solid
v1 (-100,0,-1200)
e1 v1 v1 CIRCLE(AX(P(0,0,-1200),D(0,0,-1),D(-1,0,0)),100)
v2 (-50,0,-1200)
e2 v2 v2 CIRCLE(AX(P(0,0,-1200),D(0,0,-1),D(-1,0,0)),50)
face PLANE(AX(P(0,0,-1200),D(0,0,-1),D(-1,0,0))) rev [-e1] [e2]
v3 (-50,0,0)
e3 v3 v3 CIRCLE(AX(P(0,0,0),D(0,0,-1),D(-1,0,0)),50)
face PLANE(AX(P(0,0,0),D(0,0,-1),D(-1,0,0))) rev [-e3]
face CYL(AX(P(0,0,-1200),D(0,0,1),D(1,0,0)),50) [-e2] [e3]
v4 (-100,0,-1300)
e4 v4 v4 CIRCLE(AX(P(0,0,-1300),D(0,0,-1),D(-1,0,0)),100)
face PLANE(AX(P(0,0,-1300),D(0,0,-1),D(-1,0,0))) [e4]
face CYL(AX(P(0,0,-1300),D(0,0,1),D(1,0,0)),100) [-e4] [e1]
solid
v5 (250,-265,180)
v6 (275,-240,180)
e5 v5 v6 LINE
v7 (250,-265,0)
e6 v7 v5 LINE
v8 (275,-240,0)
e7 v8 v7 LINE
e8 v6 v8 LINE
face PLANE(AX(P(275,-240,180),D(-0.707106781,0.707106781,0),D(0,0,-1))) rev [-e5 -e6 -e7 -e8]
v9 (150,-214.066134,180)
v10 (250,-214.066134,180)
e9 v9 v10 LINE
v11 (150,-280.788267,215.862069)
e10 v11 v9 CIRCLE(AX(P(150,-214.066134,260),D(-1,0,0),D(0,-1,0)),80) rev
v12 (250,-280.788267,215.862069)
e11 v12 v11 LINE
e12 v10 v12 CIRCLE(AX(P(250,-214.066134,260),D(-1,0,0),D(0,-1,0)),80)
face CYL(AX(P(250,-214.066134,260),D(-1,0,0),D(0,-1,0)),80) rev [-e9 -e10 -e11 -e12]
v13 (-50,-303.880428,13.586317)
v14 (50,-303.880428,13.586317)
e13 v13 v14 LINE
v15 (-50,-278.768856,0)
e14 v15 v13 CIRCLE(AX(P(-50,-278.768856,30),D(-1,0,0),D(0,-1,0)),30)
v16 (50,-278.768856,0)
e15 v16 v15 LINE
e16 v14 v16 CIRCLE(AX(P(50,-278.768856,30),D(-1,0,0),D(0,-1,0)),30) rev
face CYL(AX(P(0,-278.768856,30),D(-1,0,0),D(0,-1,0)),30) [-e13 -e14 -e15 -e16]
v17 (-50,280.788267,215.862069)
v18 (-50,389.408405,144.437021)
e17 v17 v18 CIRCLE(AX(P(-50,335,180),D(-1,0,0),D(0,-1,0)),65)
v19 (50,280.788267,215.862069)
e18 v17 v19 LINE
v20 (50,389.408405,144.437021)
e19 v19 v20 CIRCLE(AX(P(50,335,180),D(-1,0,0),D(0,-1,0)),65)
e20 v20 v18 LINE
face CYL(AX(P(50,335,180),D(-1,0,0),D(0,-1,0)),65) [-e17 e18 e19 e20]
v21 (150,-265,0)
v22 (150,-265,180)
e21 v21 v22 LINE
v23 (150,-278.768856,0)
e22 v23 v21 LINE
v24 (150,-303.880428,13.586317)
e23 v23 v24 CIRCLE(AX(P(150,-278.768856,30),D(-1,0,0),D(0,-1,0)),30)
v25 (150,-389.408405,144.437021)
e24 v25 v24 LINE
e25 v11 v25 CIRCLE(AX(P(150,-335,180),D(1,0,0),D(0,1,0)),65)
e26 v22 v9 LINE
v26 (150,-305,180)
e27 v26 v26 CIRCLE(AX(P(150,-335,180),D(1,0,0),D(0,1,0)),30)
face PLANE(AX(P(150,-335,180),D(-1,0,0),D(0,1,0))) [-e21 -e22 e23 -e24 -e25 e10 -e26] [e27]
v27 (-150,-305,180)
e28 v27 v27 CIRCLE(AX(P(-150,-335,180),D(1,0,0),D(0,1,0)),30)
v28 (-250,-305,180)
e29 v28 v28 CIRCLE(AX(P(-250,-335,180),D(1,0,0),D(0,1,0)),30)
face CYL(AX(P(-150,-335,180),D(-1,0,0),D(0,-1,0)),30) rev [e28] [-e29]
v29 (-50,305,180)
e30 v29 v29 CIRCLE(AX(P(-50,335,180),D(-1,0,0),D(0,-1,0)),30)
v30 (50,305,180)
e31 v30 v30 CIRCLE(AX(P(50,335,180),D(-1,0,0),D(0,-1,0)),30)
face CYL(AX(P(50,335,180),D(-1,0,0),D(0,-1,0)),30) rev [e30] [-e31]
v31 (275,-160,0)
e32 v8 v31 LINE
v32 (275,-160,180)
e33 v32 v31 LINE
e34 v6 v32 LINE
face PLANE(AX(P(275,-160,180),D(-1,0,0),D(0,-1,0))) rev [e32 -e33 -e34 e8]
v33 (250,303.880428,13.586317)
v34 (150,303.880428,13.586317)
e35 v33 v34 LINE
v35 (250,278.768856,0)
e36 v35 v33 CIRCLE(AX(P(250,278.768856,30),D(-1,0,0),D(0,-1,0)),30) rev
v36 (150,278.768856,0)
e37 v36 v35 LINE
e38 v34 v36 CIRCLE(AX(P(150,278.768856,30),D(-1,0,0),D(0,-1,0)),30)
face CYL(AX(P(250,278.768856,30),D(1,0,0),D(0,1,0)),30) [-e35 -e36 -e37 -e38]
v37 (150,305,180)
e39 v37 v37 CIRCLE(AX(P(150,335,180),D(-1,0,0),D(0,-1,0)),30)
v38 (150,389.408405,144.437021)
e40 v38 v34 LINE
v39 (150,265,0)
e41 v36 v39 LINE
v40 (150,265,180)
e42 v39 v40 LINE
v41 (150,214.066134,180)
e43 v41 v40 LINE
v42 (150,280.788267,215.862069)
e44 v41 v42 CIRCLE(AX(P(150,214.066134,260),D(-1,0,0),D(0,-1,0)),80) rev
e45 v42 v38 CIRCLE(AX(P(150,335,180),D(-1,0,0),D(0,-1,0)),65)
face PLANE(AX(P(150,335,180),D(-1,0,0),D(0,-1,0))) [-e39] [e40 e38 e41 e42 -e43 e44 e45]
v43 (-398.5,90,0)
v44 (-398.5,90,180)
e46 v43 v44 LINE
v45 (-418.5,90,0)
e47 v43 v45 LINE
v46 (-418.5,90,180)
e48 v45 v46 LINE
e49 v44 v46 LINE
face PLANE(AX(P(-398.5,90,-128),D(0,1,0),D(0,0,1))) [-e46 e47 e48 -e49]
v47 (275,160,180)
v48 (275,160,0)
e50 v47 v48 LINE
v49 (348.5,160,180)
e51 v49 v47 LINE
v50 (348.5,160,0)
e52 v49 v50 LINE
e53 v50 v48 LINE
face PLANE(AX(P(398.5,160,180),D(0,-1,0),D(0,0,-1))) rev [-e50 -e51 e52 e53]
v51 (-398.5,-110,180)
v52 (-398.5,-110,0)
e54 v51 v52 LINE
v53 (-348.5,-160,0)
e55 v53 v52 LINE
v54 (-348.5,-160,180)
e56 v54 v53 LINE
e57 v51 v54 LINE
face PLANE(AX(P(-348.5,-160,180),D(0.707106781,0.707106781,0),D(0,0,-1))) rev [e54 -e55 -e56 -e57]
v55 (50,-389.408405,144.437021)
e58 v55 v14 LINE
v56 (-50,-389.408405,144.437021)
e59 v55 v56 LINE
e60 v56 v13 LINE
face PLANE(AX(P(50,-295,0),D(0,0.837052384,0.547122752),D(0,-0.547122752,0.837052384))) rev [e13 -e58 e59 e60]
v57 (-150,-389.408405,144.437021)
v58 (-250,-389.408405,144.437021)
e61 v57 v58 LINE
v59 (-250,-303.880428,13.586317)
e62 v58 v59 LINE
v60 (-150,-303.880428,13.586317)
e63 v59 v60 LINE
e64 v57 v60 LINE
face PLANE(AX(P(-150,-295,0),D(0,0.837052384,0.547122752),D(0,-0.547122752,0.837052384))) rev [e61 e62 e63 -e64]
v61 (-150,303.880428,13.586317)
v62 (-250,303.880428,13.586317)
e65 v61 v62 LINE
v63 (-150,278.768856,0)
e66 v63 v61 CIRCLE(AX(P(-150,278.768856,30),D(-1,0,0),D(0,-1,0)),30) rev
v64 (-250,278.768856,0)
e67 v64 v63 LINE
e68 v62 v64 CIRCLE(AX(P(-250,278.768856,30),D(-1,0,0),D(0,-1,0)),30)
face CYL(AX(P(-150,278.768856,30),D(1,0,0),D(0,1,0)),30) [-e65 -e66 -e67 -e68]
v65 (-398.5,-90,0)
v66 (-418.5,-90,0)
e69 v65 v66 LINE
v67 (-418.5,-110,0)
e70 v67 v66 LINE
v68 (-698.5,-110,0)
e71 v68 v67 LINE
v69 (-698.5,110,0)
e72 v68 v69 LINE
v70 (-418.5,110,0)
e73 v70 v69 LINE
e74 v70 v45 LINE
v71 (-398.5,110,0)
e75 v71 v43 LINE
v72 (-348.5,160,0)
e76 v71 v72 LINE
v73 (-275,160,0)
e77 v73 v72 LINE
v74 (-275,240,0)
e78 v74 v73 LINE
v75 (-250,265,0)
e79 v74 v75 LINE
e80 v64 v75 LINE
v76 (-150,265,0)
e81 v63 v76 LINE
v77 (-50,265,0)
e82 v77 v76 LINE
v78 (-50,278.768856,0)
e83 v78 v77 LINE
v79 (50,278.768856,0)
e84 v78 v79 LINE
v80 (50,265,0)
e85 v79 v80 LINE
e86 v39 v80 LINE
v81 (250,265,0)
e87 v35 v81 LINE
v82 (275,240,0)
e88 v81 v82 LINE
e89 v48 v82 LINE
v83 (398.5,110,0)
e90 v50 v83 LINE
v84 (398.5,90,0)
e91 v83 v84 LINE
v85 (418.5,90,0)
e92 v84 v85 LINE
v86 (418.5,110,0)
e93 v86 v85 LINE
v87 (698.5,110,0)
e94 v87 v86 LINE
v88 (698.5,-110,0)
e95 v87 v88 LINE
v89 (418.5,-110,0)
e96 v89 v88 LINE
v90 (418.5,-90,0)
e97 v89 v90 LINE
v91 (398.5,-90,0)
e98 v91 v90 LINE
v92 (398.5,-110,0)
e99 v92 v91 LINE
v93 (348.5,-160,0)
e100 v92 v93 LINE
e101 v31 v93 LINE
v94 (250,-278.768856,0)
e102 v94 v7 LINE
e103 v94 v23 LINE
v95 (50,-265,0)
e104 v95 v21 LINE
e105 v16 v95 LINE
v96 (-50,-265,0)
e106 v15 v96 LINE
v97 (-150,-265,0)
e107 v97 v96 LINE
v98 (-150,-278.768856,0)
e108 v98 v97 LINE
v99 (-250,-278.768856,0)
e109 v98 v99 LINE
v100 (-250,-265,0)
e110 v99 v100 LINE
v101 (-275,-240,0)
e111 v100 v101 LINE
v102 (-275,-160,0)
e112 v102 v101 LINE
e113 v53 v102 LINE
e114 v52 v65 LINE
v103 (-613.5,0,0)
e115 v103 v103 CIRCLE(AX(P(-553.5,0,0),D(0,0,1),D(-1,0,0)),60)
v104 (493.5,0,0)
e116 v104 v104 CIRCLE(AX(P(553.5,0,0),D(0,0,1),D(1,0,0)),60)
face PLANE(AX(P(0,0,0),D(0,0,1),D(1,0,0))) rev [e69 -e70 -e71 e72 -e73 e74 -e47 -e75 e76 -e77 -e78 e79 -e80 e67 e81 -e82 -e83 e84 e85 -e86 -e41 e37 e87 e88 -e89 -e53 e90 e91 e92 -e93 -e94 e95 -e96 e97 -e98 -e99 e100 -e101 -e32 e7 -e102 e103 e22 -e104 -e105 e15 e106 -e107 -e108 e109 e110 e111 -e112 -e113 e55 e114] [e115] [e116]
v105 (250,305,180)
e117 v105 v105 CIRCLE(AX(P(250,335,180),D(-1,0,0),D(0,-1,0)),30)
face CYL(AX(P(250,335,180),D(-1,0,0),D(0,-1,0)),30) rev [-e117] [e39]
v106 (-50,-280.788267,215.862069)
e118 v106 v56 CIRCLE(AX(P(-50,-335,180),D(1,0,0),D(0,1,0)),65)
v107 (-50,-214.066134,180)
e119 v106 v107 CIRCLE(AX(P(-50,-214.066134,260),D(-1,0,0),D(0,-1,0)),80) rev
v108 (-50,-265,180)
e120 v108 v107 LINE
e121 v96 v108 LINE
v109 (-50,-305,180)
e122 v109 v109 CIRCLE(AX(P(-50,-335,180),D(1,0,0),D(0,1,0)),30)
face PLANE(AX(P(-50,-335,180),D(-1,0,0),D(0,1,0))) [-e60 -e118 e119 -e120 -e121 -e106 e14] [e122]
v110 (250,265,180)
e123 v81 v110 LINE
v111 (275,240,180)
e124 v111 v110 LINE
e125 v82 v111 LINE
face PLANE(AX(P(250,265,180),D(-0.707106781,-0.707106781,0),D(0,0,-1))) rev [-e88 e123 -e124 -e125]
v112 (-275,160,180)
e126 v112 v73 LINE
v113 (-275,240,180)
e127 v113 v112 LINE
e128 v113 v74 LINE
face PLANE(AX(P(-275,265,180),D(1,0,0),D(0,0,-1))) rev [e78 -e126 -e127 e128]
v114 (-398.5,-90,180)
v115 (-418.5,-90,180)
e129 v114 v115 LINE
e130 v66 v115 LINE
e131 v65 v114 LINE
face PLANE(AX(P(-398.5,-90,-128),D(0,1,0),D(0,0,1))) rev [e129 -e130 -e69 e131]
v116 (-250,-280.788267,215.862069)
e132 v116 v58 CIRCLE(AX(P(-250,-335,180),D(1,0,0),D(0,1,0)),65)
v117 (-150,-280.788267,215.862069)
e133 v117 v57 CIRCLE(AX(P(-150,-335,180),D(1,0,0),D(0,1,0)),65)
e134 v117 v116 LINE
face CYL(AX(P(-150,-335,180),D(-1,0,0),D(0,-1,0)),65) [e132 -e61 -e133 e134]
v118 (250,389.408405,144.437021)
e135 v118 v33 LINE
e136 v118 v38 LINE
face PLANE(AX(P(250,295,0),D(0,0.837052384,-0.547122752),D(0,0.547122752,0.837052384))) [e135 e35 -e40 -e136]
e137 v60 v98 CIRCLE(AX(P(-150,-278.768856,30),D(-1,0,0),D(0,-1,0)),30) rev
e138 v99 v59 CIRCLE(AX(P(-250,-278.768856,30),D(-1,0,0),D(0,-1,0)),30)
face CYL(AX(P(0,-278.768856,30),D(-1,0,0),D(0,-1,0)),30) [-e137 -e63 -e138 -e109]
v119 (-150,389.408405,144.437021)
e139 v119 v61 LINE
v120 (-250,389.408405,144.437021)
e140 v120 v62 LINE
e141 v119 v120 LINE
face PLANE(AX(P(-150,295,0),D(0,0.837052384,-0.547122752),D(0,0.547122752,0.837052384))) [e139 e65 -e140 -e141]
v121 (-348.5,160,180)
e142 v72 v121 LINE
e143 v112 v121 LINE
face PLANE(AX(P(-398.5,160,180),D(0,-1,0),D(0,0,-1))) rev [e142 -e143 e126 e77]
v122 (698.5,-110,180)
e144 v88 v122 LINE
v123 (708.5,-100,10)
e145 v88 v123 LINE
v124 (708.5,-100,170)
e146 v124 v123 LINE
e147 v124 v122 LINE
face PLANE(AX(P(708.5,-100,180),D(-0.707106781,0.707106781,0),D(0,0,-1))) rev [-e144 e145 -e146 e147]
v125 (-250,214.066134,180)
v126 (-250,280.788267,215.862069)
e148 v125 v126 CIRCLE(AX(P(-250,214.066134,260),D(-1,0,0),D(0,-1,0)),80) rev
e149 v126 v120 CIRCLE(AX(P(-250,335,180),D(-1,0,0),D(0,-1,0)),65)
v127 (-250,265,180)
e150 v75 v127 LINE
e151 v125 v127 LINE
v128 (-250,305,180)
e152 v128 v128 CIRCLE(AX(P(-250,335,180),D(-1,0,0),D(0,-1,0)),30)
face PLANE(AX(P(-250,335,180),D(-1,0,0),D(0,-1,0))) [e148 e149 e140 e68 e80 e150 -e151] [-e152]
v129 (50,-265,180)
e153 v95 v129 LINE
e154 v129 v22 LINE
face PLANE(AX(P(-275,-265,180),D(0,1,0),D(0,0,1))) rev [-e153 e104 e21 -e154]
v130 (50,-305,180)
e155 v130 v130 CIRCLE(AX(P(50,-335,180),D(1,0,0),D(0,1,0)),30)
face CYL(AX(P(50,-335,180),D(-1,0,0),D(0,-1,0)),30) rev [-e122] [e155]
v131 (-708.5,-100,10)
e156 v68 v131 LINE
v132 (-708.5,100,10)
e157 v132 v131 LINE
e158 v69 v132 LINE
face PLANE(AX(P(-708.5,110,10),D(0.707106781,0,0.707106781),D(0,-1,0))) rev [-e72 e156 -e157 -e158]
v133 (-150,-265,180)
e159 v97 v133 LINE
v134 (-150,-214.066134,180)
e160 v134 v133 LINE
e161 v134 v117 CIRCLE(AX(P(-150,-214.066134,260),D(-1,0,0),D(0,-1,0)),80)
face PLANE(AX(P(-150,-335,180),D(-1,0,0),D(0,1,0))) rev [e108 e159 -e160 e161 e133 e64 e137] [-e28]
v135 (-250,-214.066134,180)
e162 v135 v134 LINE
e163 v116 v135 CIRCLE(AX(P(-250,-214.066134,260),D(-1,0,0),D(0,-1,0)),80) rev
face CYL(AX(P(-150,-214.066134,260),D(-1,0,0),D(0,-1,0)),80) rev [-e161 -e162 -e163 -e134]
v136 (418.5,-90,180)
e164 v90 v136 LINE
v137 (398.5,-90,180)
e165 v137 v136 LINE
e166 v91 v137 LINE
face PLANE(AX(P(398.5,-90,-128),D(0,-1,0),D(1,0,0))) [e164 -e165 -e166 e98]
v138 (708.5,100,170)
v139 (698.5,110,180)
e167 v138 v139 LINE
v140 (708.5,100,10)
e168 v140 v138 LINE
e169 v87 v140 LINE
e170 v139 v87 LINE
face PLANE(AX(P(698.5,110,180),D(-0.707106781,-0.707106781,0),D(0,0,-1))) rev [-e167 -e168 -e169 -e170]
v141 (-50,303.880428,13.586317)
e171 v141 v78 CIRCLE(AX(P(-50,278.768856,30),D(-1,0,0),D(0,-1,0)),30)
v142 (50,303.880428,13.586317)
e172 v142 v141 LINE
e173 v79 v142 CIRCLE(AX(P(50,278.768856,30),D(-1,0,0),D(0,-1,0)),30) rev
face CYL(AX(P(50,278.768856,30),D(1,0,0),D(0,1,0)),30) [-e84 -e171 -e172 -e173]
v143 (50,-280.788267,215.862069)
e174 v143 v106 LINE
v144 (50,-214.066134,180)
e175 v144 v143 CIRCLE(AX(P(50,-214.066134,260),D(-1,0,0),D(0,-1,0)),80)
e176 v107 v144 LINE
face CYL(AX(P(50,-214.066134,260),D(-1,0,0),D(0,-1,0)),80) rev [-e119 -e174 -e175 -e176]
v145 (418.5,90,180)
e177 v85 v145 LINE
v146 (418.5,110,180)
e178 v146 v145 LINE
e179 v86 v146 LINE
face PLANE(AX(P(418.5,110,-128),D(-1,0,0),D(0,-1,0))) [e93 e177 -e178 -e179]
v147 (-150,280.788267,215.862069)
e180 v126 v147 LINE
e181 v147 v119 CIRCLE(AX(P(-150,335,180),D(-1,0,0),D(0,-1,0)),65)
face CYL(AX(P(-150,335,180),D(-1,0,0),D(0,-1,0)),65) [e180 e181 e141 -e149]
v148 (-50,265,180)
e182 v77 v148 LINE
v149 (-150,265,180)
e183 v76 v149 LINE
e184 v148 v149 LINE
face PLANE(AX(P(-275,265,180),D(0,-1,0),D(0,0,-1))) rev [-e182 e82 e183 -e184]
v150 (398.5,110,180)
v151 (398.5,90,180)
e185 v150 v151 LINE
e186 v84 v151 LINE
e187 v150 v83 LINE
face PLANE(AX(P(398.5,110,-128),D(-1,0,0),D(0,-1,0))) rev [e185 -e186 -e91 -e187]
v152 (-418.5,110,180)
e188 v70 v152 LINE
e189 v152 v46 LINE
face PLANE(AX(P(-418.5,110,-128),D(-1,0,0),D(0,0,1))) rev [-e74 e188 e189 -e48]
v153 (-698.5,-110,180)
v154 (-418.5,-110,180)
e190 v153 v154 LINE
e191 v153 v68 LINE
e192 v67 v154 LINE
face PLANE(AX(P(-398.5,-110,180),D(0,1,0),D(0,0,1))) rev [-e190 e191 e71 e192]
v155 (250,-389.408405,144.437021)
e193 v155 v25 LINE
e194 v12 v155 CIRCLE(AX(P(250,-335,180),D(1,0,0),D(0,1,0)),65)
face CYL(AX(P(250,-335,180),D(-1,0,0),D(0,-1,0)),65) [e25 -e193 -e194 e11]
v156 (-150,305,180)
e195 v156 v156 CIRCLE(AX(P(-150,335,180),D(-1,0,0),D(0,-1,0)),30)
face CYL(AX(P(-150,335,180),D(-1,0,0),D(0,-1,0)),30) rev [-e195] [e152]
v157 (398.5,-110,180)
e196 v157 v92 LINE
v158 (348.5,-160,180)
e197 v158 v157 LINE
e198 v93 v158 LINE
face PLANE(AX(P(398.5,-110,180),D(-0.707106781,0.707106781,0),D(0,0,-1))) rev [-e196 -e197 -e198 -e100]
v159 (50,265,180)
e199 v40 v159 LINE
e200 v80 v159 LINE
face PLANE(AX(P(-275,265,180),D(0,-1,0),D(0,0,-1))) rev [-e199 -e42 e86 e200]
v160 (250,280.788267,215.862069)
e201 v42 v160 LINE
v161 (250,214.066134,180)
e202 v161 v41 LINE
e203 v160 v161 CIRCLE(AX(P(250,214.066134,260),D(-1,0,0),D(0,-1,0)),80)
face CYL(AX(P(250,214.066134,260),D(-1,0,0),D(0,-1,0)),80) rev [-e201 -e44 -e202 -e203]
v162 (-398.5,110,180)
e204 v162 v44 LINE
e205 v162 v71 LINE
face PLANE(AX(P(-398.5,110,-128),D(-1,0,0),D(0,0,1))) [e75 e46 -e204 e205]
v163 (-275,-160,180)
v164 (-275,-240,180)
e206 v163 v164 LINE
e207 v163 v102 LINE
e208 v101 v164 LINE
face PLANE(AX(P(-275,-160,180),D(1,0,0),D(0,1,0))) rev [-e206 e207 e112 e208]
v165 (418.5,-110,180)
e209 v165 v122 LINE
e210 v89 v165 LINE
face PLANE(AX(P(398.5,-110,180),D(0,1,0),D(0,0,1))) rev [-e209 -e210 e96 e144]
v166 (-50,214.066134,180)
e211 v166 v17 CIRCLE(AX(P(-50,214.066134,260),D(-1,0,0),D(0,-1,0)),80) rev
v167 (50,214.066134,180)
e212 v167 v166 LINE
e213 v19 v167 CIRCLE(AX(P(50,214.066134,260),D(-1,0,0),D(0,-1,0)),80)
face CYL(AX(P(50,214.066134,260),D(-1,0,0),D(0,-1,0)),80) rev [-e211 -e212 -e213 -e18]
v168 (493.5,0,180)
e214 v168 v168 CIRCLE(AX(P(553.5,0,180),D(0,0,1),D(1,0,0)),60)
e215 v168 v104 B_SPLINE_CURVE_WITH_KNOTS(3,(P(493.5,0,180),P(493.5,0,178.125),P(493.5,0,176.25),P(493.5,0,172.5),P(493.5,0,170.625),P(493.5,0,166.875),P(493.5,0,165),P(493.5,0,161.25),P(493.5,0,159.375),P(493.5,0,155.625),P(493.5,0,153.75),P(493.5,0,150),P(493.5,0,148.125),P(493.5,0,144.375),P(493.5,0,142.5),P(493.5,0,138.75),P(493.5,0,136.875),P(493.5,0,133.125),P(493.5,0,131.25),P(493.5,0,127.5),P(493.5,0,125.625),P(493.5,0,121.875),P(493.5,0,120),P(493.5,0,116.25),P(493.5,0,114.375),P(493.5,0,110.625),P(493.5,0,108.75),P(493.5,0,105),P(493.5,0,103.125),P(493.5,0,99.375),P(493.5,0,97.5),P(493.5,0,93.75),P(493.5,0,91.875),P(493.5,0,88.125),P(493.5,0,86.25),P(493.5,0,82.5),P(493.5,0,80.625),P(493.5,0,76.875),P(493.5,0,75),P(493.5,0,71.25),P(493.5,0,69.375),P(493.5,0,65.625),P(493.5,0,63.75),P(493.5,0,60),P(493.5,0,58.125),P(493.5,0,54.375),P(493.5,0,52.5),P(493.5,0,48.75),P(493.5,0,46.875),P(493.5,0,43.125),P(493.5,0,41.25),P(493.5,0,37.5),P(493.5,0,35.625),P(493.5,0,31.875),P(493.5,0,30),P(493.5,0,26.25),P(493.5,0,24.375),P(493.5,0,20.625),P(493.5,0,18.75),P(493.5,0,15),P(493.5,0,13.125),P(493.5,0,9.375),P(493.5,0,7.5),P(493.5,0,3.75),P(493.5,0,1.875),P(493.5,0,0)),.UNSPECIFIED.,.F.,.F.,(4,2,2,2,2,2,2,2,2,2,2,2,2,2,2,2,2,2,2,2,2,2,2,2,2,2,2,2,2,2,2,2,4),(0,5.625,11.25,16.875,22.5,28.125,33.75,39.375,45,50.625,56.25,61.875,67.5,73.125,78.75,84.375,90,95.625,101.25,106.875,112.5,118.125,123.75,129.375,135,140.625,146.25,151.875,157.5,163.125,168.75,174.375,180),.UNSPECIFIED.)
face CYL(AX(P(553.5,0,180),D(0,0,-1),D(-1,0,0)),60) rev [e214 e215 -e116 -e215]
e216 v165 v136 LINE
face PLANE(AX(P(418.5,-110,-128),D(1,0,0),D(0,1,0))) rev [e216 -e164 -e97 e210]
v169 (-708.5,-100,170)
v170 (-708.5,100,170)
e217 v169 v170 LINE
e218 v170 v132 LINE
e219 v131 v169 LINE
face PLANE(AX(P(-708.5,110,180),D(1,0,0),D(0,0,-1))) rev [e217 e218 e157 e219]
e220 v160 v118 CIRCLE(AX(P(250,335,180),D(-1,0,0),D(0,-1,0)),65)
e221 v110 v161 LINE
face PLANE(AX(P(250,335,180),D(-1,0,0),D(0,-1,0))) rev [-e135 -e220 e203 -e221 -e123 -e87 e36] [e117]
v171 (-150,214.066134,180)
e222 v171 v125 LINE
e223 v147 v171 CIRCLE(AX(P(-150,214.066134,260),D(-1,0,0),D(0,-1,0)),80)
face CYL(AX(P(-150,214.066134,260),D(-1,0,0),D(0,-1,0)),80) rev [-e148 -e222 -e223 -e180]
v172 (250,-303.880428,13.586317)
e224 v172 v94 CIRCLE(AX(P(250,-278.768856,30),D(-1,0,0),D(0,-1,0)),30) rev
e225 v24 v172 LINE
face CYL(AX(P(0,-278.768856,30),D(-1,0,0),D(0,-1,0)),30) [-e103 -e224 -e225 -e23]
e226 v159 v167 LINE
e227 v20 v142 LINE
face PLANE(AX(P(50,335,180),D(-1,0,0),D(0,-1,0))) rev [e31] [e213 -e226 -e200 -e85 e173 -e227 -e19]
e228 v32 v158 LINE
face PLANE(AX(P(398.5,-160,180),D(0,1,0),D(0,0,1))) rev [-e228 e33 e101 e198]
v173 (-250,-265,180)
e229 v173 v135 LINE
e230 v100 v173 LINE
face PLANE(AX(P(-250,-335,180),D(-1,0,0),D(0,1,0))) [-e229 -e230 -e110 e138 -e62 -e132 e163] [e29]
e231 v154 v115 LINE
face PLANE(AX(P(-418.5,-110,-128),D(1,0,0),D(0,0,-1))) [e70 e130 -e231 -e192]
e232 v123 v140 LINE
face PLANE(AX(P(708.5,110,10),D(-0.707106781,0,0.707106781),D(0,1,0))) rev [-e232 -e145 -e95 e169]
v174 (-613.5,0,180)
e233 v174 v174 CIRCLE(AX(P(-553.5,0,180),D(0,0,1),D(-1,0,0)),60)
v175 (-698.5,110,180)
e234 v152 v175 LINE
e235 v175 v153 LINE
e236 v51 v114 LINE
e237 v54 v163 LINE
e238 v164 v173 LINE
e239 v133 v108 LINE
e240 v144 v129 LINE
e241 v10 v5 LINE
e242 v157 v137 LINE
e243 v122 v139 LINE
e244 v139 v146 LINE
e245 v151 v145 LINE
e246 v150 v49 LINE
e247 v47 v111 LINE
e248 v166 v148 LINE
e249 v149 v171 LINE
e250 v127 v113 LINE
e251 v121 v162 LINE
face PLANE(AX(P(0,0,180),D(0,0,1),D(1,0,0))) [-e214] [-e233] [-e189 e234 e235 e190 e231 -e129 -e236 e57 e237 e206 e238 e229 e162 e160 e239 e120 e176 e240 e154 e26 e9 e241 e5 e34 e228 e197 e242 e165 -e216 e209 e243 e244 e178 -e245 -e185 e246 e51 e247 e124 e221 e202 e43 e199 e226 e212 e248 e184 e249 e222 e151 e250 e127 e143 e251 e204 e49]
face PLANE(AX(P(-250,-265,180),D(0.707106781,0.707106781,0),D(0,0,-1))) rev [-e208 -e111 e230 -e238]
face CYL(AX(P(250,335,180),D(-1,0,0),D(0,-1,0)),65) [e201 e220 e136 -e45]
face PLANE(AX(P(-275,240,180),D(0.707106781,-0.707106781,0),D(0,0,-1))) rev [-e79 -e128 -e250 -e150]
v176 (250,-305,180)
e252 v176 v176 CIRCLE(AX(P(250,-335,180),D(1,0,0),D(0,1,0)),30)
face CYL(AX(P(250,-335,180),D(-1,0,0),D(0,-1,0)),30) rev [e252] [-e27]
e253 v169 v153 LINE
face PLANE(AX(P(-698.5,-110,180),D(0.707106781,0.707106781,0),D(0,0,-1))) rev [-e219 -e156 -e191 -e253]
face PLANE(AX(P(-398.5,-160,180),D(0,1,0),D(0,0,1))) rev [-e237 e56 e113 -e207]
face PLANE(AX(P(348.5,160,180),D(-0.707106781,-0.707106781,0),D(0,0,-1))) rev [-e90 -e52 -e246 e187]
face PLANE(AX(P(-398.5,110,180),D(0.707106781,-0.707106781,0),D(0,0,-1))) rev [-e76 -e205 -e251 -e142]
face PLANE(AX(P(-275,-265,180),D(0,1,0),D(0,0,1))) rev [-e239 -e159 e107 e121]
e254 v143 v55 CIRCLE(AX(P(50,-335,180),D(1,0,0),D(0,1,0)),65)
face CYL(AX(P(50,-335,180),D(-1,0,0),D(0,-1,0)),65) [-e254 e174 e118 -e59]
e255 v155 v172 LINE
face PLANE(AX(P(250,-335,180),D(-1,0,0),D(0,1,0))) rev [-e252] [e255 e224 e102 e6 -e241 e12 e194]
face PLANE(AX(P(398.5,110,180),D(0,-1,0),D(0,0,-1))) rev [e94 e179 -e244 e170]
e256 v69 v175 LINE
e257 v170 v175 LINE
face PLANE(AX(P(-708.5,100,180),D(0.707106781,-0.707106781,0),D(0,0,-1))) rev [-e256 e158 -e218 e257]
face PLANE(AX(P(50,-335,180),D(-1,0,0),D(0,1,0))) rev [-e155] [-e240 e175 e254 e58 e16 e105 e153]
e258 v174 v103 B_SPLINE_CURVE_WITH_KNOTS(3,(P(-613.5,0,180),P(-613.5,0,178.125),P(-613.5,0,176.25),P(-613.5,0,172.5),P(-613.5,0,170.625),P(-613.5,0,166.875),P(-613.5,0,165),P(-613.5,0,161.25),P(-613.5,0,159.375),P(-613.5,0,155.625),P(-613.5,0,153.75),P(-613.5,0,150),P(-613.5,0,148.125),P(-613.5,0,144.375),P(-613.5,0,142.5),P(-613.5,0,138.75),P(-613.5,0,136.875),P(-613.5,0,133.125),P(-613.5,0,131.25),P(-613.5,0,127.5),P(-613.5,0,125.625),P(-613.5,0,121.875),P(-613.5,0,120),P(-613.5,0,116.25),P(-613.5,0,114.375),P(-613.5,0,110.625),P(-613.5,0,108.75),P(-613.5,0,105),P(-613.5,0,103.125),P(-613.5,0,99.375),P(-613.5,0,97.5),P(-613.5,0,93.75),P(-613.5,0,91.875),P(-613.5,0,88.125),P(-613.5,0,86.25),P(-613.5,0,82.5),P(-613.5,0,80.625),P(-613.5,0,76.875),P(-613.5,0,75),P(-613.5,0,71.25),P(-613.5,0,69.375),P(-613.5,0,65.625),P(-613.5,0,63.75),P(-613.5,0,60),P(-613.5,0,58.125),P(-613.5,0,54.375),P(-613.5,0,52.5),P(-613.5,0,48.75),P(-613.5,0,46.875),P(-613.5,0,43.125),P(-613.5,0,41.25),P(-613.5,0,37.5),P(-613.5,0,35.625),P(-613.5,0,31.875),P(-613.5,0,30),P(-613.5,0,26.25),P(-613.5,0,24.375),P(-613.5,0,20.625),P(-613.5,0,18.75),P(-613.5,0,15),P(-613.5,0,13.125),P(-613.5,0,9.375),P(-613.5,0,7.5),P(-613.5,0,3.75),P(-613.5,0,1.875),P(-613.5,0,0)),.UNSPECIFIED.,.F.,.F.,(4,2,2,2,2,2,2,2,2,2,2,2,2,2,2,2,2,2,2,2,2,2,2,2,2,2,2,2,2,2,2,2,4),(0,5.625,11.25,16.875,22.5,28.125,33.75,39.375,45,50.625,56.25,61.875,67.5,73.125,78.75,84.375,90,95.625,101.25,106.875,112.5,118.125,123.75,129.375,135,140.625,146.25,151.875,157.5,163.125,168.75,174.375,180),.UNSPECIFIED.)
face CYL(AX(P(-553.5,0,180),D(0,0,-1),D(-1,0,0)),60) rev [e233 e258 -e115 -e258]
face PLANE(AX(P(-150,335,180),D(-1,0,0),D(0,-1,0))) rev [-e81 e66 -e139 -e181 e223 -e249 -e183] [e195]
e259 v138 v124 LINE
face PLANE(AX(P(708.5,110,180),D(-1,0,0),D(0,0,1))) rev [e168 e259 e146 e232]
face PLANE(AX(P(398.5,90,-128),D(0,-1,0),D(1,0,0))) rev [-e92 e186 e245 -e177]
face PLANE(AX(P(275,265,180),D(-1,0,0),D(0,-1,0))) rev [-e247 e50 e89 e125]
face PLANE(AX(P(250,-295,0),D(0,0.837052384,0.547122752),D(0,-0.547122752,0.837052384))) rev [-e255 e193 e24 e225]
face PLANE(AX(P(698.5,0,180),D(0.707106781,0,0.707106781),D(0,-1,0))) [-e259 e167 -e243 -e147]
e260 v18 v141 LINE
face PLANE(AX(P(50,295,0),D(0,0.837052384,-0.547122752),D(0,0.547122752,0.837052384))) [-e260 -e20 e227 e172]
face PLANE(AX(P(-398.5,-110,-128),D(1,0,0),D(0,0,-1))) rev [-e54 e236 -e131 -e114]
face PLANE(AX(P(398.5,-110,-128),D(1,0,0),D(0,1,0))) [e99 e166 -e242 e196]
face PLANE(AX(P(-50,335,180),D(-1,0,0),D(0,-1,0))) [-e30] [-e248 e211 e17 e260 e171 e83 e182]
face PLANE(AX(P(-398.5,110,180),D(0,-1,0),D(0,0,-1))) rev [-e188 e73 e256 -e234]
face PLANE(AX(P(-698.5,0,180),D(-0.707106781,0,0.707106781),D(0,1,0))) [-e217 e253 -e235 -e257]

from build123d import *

# Parameters (mm, degrees)
SKETCH1_R               = 60
BOSS_EXTRUDE1_DEPTH     = 180
SKETCH3_R               = 30
BOSS_EXTRUDE2_DEPTH     = 50
CHAMFER5_SIZE           = 50
CHAMFER6_SIZE           = 10
FILLET1_R               = 30
FILLET2_R               = 80
LPATTERN4_START         = -250
LPATTERN4_OUTLINE_R     = 30
LPATTERN4_DEPTH         = 100
LPATTERN4_START_2       = 150
LPATTERN4_2_OUTLINE_R   = 30
LPATTERN4_2_DEPTH       = 100
MIRROR1_START           = -250
MIRROR1_OUTLINE_R       = 30
MIRROR1_DEPTH           = 100
MIRROR1_START_2         = -50
MIRROR1_2_OUTLINE_R     = 30
MIRROR1_2_DEPTH         = 100
MIRROR1_START_3         = 150
MIRROR1_3_OUTLINE_R     = 30
MIRROR1_3_DEPTH         = 100
SKETCH4_W               = 20
SKETCH4_H               = 20
CUT_EXTRUDE1_DEPTH      = 308
MIRROR3_COPY_1_SKETCH_W = 20
MIRROR3_COPY_1_SKETCH_H = 20
MIRROR3_COPY_1_DEPTH    = 308
CHAMFER7_SIZE           = 25
CHAMFER8_SIZE           = 25
SKETCH5_R               = 50
BOSS_EXTRUDE3_DEPTH     = 1200
SKETCH6_R               = 100
BOSS_EXTRUDE4_DEPTH     = 100


# Read off the part's stored shape, not the designer's step: LPattern4, Mirror1
# Some blends are built 0.0001 mm under size
with BuildPart() as part:
    # Sketch1 → Boss-Extrude1 (new body)
    with BuildSketch(Plane.XY):
        Polygon((398.5, 110), (708.5, 110), (708.5, -110), (398.5, -110), (398.5, -160), (275, -160), (275, -265), (-275, -265), (-275, -160), (-398.5, -160), (-398.5, -110), (-708.5, -110), (-708.5, 110), (-398.5, 110), (-398.5, 160), (-275, 160), (-275, 265), (275, 265), (275, 160), (398.5, 160), align=None)
        with Locations(Location((553.5, 0, 0), (0, 0, 180))):
            Circle(SKETCH1_R, mode=Mode.SUBTRACT)
        with Locations(Location((-553.5, 0, 0), (0, 0, 180))):
            Circle(SKETCH1_R, mode=Mode.SUBTRACT)
    extrude(amount=BOSS_EXTRUDE1_DEPTH)

    # Sketch3 → Boss-Extrude2 (add, symmetric)
    with BuildSketch(Plane.ZY):
        with BuildLine():
            Line((0, 295), (144.437021115, 389.408404983))
            ThreePointArc((144.437021115, 389.408404983), (237.667058368, 364.991838543), (204.124993391, 274.642857143))
            Line((204.124993391, 274.642857143), (180, 265))
            Line((180, 265), (0, 265))
            Line((0, 265), (0, 295))
        make_face()
        with Locations(Location((180, 335, 0), (0, 0, 270))):
            Circle(SKETCH3_R, mode=Mode.SUBTRACT)
    extrude(amount=BOSS_EXTRUDE2_DEPTH, both=True)

    # Chamfer5
    chamfer5_edges = [part.edges().sort_by_distance(p)[0] for p in [
        (-398.5, -160, 90),
        (-398.5, 160, 90),
        (398.5, -160, 90),
        (398.5, 160, 90),
    ]]
    chamfer(chamfer5_edges, length=CHAMFER5_SIZE - 0.0001)  # a hair under: the kernel refuses the full size

    # Chamfer6
    chamfer6_edges = [part.edges().sort_by_distance(p)[0] for p in [
        (-708.5, 0, 0),
        (708.5, 0, 0),
        (708.5, -110, 90),
        (-708.5, -110, 90),
        (-708.5, 110, 90),
        (708.5, 110, 90),
        (-708.5, 0, 180),
        (708.5, 0, 180),
    ]]
    chamfer(chamfer6_edges, length=CHAMFER6_SIZE)

    # Fillet1
    fillet1_edges = [part.edges().sort_by_distance(p)[0] for p in [
        (0, 295, 0),
    ]]
    fillet(fillet1_edges, radius=FILLET1_R)

    # Fillet2
    # the kernel refuses this fillet: 80 mm, written as the material it adds along each edge
    with BuildSketch(Plane(origin=(50, 265, 180), x_dir=(0, 0.40293010852781525, 0.9152307510359139), z_dir=(-1, 0, 0))) as fillet2_piece_1:
        with BuildLine():
            CenterArc((52.695671837, -78.85064932), FILLET2_R, 99.723894653, 56.514623377)
            Line((-20.522788246, -46.616240638), (-27.844634254, -43.39279977))
            Line((-27.844634254, -43.39279977), (-7.321846008, 3.223440868))
            Line((-7.321846008, 3.223440868), (0.275664529, 7.995249156))
            ThreePointArc((0.275664529, 7.995249156), (26.240997825, 7.100002336), (37.83243285, 7.885064932))
            Line((37.83243285, 7.885064932), (39.183636394, 0))
        make_face()
    extrude(amount=100)

    # LPattern4 outline → LPattern4 (add)
    with BuildSketch(Plane.YZ.offset(LPATTERN4_START)):
        with BuildLine():
            ThreePointArc((389.408404983, 144.437021115), (370.712659311, 234.310274948), (280.788266865, 215.862068966))
            ThreePointArc((280.788266865, 215.862068966), (251.940699894, 189.533573658), (214.066133776, 180))
            Line((214.066133776, 180), (265, 180))
            Line((265, 180), (265, 0))
            Line((265, 0), (278.768856416, 0))
            ThreePointArc((278.768856416, 0), (293.044526683, 3.614298599), (303.880427947, 13.586317438))
            Line((303.880427947, 13.586317438), (389.408404983, 144.437021115))
        make_face()
        with Locations((335, 180)):
            Circle(LPATTERN4_OUTLINE_R, mode=Mode.SUBTRACT)
    extrude(amount=LPATTERN4_DEPTH)

    # LPattern4 2 outline → LPattern4 2 (add)
    with BuildSketch(Plane.YZ.offset(LPATTERN4_START_2)):
        with BuildLine():
            ThreePointArc((389.408404983, 144.437021115), (370.712659311, 234.310274948), (280.788266865, 215.862068966))
            ThreePointArc((280.788266865, 215.862068966), (251.940699894, 189.533573658), (214.066133776, 180))
            Line((214.066133776, 180), (265, 180))
            Line((265, 180), (265, 0))
            Line((265, 0), (278.768856416, 0))
            ThreePointArc((278.768856416, 0), (293.044526683, 3.614298599), (303.880427947, 13.586317438))
            Line((303.880427947, 13.586317438), (389.408404983, 144.437021115))
        make_face()
        with Locations((335, 180)):
            Circle(LPATTERN4_2_OUTLINE_R, mode=Mode.SUBTRACT)
    extrude(amount=LPATTERN4_2_DEPTH)

    # Mirror1 outline → Mirror1 (add)
    with BuildSketch(Plane.YZ.offset(MIRROR1_START)):
        with BuildLine():
            ThreePointArc((-280.788266865, 215.862068966), (-370.712659311, 234.310274948), (-389.408404983, 144.437021115))
            Line((-389.408404983, 144.437021115), (-303.880427947, 13.586317438))
            ThreePointArc((-303.880427947, 13.586317438), (-293.044526683, 3.614298599), (-278.768856416, 0))
            Line((-278.768856416, 0), (-265, 0))
            Line((-265, 0), (-265, 180))
            Line((-265, 180), (-214.066133776, 180))
            ThreePointArc((-214.066133776, 180), (-251.940699894, 189.533573658), (-280.788266865, 215.862068966))
        make_face()
        with Locations((-335, 180)):
            Circle(MIRROR1_OUTLINE_R, mode=Mode.SUBTRACT)
    extrude(amount=MIRROR1_DEPTH)

    # Mirror1 2 outline → Mirror1 2 (add)
    with BuildSketch(Plane.YZ.offset(MIRROR1_START_2)):
        with BuildLine():
            ThreePointArc((-280.788266865, 215.862068966), (-370.712659311, 234.310274948), (-389.408404983, 144.437021115))
            Line((-389.408404983, 144.437021115), (-303.880427947, 13.586317438))
            ThreePointArc((-303.880427947, 13.586317438), (-293.044526683, 3.614298599), (-278.768856416, 0))
            Line((-278.768856416, 0), (-265, 0))
            Line((-265, 0), (-265, 180))
            Line((-265, 180), (-214.066133776, 180))
            ThreePointArc((-214.066133776, 180), (-251.940699894, 189.533573658), (-280.788266865, 215.862068966))
        make_face()
        with Locations((-335, 180)):
            Circle(MIRROR1_2_OUTLINE_R, mode=Mode.SUBTRACT)
    extrude(amount=MIRROR1_2_DEPTH)

    # Mirror1 3 outline → Mirror1 3 (add)
    with BuildSketch(Plane.YZ.offset(MIRROR1_START_3)):
        with BuildLine():
            ThreePointArc((-280.788266865, 215.862068966), (-370.712659311, 234.310274948), (-389.408404983, 144.437021115))
            Line((-389.408404983, 144.437021115), (-303.880427947, 13.586317438))
            ThreePointArc((-303.880427947, 13.586317438), (-293.044526683, 3.614298599), (-278.768856416, 0))
            Line((-278.768856416, 0), (-265, 0))
            Line((-265, 0), (-265, 180))
            Line((-265, 180), (-214.066133776, 180))
            ThreePointArc((-214.066133776, 180), (-251.940699894, 189.533573658), (-280.788266865, 215.862068966))
        make_face()
        with Locations((-335, 180)):
            Circle(MIRROR1_3_OUTLINE_R, mode=Mode.SUBTRACT)
    extrude(amount=MIRROR1_3_DEPTH)

    # Sketch4 → Cut-Extrude1 (cut)
    with BuildSketch(Plane.XY.offset(180)):
        with Locations((-408.5, 100)):
            Rectangle(SKETCH4_W, SKETCH4_H)
    cut_extrude1 = extrude(amount=-CUT_EXTRUDE1_DEPTH, mode=Mode.SUBTRACT)

    # Mirror2: Cut-Extrude1 across plane
    add(cut_extrude1.mirror(Plane.ZX), mode=Mode.SUBTRACT)

    # Mirror3: Cut-Extrude1 across plane
    add(cut_extrude1.mirror(Plane.ZY), mode=Mode.SUBTRACT)

    # Mirror3 copy 1 sketch → Mirror3 copy 1 (cut)
    with BuildSketch(Plane(origin=(0, 0, 180), x_dir=(-1, 0, 0), z_dir=(0, 0, 1))):
        with Locations((-408.5, 100)):
            Rectangle(MIRROR3_COPY_1_SKETCH_W, MIRROR3_COPY_1_SKETCH_H)
    extrude(amount=-MIRROR3_COPY_1_DEPTH, mode=Mode.SUBTRACT)

    # Chamfer7
    chamfer7_edges = [part.edges().sort_by_distance(p)[0] for p in [
        (275, 265, 90),
        (-275, 265, 90),
    ]]
    chamfer(chamfer7_edges, length=CHAMFER7_SIZE - 0.0001)  # a hair under: the kernel refuses the full size

    # Chamfer8
    chamfer8_edges = [part.edges().sort_by_distance(p)[0] for p in [
        (-275, -265, 90),
        (275, -265, 90),
    ]]
    chamfer(chamfer8_edges, length=CHAMFER8_SIZE - 0.0001)  # a hair under: the kernel refuses the full size


with BuildPart() as body_2:
    # Sketch5 → Boss-Extrude3 (new body)
    with BuildSketch(Plane(origin=(0, 0, 0), x_dir=(-1, 0, 0), z_dir=(0, 0, -1))):
        Circle(SKETCH5_R)
    extrude(amount=BOSS_EXTRUDE3_DEPTH)

    # Sketch6 → Boss-Extrude4 (add)
    with BuildSketch(Plane(origin=(0, 0, -1200), x_dir=(-1, 0, 0), z_dir=(0, 0, -1))):
        Circle(SKETCH6_R)
    extrude(amount=BOSS_EXTRUDE4_DEPTH)


solid = Compound([part.part, body_2.part])
